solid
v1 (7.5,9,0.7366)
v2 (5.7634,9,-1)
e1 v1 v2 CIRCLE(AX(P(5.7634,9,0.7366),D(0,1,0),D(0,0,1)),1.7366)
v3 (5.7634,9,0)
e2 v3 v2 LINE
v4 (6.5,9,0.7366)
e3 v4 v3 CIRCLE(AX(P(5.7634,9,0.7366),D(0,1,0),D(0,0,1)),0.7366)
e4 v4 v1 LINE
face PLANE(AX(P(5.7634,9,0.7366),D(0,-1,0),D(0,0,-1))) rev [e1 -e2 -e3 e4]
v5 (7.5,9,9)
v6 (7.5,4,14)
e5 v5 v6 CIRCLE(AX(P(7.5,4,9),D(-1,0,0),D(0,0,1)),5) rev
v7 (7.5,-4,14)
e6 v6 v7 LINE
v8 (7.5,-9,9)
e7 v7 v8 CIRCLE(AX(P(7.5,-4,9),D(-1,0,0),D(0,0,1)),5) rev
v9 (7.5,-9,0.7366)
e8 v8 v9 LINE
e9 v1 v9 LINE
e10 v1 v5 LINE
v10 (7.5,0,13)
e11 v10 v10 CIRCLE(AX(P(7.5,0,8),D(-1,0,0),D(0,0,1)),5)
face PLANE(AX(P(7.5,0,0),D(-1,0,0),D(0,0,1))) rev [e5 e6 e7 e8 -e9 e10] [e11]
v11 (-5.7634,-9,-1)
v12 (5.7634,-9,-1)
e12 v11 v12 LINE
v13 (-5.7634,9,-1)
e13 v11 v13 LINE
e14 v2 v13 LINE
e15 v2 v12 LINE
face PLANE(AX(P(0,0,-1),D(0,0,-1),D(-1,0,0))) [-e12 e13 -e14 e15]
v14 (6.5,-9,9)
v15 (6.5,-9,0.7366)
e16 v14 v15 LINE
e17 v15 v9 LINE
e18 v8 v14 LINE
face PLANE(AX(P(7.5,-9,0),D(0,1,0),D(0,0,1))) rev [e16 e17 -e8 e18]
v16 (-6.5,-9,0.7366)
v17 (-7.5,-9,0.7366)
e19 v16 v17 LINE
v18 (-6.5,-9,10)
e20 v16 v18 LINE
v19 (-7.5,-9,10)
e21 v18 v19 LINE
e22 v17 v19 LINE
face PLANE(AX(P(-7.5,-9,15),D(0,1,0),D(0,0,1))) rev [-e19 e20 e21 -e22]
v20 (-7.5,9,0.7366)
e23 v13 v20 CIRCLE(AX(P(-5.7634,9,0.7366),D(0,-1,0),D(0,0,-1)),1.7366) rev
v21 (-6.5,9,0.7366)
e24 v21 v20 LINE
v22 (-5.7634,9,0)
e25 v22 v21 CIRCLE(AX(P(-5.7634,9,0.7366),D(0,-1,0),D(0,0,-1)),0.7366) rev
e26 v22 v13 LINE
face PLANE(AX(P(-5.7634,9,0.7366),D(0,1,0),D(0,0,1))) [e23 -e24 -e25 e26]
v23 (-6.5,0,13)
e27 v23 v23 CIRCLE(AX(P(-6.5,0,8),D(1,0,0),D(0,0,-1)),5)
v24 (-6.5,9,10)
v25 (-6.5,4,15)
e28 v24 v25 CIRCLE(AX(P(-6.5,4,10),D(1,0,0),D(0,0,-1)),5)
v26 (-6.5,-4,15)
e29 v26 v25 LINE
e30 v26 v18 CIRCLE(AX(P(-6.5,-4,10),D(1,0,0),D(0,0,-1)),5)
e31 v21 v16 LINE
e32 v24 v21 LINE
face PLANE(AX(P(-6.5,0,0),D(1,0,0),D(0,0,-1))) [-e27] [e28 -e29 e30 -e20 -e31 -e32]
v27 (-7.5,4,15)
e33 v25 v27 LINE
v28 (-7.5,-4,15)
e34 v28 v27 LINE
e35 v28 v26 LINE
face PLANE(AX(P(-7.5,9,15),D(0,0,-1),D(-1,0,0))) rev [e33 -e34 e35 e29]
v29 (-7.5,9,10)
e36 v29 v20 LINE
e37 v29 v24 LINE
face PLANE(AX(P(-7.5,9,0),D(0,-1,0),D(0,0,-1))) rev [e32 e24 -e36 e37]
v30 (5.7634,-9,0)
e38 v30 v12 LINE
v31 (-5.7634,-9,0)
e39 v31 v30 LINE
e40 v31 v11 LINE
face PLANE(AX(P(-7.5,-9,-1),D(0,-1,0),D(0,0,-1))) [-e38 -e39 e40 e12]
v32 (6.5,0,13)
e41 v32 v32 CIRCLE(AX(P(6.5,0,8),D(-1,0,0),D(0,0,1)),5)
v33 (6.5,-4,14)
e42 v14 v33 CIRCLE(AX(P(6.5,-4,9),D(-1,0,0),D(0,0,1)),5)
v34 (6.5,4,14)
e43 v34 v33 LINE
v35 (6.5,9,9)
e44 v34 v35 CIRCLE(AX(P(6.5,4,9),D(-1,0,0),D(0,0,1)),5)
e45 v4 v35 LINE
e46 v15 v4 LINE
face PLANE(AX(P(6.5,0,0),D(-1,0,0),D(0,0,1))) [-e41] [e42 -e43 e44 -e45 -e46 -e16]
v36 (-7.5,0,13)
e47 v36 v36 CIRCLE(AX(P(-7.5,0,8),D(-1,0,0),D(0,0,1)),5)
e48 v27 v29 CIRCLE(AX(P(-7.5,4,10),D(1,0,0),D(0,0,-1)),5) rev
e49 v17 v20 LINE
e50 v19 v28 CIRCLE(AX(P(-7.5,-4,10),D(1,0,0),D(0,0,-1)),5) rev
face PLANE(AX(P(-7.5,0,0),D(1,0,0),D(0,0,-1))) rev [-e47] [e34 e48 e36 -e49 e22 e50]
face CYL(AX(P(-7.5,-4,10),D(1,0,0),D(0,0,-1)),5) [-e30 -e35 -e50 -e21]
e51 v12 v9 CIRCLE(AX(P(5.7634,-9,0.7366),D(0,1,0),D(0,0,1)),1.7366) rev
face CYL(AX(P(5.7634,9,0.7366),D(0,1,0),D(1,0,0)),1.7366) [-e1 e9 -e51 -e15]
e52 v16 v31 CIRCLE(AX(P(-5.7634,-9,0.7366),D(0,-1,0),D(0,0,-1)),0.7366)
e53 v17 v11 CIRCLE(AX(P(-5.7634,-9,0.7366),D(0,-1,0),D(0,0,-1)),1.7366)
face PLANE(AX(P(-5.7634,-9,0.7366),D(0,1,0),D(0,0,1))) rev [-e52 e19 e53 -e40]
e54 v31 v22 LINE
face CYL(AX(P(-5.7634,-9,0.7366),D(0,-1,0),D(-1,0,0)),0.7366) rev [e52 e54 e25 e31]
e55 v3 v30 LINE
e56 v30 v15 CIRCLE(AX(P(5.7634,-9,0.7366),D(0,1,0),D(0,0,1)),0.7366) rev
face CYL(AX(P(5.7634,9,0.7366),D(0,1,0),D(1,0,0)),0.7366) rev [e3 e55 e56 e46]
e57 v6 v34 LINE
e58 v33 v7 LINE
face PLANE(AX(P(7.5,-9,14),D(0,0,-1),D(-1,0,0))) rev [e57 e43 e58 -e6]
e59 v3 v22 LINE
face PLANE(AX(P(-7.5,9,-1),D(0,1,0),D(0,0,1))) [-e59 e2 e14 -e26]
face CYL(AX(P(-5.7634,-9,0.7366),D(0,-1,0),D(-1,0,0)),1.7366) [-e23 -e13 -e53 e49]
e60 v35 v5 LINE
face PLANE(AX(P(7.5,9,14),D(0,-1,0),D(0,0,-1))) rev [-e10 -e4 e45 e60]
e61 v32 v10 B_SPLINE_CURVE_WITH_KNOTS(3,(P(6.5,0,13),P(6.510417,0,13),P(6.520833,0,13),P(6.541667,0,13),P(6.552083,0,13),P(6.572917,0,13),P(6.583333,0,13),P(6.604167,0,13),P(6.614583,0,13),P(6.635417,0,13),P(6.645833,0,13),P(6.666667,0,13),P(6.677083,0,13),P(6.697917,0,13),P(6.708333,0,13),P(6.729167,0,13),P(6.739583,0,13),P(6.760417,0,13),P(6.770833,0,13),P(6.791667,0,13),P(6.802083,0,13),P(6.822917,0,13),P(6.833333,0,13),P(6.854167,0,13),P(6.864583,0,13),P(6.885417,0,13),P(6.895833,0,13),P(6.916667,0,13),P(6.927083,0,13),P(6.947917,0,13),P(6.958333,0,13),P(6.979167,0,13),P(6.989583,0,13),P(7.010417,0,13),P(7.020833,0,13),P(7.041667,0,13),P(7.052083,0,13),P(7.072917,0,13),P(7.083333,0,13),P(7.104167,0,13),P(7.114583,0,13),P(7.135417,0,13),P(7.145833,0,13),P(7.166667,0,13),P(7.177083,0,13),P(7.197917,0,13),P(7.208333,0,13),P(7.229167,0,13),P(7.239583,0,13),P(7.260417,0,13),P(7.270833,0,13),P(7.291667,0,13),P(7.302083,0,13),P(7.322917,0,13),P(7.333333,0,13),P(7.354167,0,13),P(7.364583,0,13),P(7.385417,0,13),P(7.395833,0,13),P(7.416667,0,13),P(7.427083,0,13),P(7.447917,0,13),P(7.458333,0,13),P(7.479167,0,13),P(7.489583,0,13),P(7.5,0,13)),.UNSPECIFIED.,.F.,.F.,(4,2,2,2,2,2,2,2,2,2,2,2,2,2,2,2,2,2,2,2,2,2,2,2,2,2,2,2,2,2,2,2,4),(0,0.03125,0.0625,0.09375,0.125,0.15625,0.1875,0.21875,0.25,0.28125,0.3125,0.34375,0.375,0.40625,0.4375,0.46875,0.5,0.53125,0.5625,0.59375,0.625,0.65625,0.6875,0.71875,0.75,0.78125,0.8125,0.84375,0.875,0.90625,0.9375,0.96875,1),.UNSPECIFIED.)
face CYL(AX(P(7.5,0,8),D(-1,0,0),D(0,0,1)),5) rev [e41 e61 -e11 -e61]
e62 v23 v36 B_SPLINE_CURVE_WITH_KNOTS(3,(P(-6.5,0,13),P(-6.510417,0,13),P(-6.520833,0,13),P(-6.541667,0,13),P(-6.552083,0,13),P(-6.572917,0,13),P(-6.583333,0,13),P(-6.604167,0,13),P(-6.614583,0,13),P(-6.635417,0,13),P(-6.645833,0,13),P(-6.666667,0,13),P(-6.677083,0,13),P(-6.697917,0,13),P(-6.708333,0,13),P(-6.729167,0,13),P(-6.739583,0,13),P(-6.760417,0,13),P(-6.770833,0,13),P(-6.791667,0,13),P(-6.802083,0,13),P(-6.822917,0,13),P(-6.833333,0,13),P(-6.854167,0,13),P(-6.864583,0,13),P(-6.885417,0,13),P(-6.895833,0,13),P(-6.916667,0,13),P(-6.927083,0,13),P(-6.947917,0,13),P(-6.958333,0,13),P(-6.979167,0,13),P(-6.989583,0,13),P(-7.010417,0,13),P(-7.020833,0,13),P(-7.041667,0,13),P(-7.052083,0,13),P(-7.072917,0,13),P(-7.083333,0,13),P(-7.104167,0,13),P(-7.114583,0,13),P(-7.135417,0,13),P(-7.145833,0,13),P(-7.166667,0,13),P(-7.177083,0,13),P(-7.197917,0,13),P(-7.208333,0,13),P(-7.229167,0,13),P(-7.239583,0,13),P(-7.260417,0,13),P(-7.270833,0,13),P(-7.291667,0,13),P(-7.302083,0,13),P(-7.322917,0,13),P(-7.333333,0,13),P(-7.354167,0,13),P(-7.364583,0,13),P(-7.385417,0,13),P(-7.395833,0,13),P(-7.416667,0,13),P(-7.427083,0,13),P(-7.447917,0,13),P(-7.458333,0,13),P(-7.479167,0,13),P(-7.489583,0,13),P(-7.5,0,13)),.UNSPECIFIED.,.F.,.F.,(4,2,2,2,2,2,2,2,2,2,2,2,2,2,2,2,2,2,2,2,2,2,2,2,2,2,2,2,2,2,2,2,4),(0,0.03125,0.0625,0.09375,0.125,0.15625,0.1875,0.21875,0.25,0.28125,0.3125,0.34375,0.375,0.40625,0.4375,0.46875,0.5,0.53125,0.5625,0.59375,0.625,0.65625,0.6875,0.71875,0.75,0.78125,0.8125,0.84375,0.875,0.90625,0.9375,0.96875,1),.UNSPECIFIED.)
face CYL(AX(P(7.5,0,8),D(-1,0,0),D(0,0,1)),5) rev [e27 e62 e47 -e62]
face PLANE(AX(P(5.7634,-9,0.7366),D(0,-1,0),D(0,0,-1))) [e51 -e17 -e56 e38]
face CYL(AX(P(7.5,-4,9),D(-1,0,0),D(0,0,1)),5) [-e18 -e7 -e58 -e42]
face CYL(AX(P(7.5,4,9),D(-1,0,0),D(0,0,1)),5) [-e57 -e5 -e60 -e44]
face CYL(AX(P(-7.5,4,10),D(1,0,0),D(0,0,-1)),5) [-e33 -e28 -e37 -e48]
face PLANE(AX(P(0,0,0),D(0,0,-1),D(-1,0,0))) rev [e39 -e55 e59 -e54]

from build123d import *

# Parameters (mm, degrees)
SKETCH2_W                    = 15
SKETCH2_H                    = 18
BASE_FLANGE1_DEPTH           = 1
EDGE_FLANGE1_STRIP_W         = 5.4732
EDGE_FLANGE1_STRIP_H         = 1
EDGE_FLANGE1_STRIP_CUT_DEPTH = 18
EDGE_FLANGE1_DEPTH           = 18
EDGE_FLANGE2_STRIP_W         = 5.4732
EDGE_FLANGE2_STRIP_H         = 1
EDGE_FLANGE2_STRIP_CUT_DEPTH = 18
EDGE_FLANGE2_DEPTH           = 18
SKETCH13_R                   = 5
CUT_EXTRUDE1_DEPTH           = 24.043437244
FILLET1_R                    = 5


# Sheet-metal steps are written as plain solids
with BuildPart() as part:
    # Sketch2 → Base-Flange1 (new body)
    with BuildSketch(Plane.XY):
        Rectangle(SKETCH2_W, SKETCH2_H)
    extrude(amount=-BASE_FLANGE1_DEPTH)

    # Edge-Flange1 strip (across the edge) → Edge-Flange1 strip cut (cut)
    with BuildSketch(Plane(origin=(7.5, -9, 0), x_dir=(-1, 0, 0), z_dir=(0, 1, 0))):
        with Locations((-1, -0.5)):
            Rectangle(EDGE_FLANGE1_STRIP_W, EDGE_FLANGE1_STRIP_H)
    extrude(amount=EDGE_FLANGE1_STRIP_CUT_DEPTH, mode=Mode.SUBTRACT)

    # Edge-Flange1 section (across the edge) → Edge-Flange1 (add)
    with BuildSketch(Plane(origin=(7.5, -9, 0), x_dir=(-1, 0, 0), z_dir=(0, 1, 0))):
        with BuildLine():
            Line((0, 0.7366), (0, 14))
            Line((0, 14), (1, 14))
            Line((1, 14), (1, 0.7366))
            ThreePointArc((1, 0.7366), (1.215745145, 0.215745145), (1.7366, 0))
            Line((1.7366, 0), (1.7366, -1))
            ThreePointArc((1.7366, -1), (0.508638364, -0.491361636), (0, 0.7366))
        make_face()
    extrude(amount=EDGE_FLANGE1_DEPTH)

    # Edge-Flange2 strip (across the edge) → Edge-Flange2 strip cut (cut)
    with BuildSketch(Plane(origin=(-7.5, 9, 0), x_dir=(1, 0, 0), z_dir=(0, -1, 0))):
        with Locations((-1, -0.5)):
            Rectangle(EDGE_FLANGE2_STRIP_W, EDGE_FLANGE2_STRIP_H)
    extrude(amount=EDGE_FLANGE2_STRIP_CUT_DEPTH, mode=Mode.SUBTRACT)

    # Edge-Flange2 section (across the edge) → Edge-Flange2 (add)
    with BuildSketch(Plane(origin=(-7.5, 9, 0), x_dir=(1, 0, 0), z_dir=(0, -1, 0))):
        with BuildLine():
            Line((0, 0.7366), (0, 15))
            Line((0, 15), (1, 15))
            Line((1, 15), (1, 0.7366))
            ThreePointArc((1, 0.7366), (1.215745145, 0.215745145), (1.7366, 0))
            Line((1.7366, 0), (1.7366, -1))
            ThreePointArc((1.7366, -1), (0.508638364, -0.491361636), (0, 0.7366))
        make_face()
    extrude(amount=EDGE_FLANGE2_DEPTH)

    # Sketch13 → Cut-Extrude1 (cut, through all)
    with BuildSketch(Plane.ZY.offset(7.5)):
        with Locations((8, 0)):
            Circle(SKETCH13_R)
    extrude(amount=-CUT_EXTRUDE1_DEPTH, mode=Mode.SUBTRACT)

    # Fillet1
    fillet1_edges = [part.edges().sort_by_distance(p)[0] for p in [
        (7, -9, 14),
        (7, 9, 14),
        (-7, 9, 15),
        (-7, -9, 15),
    ]]
    fillet(fillet1_edges, radius=FILLET1_R)


solid = part.part
